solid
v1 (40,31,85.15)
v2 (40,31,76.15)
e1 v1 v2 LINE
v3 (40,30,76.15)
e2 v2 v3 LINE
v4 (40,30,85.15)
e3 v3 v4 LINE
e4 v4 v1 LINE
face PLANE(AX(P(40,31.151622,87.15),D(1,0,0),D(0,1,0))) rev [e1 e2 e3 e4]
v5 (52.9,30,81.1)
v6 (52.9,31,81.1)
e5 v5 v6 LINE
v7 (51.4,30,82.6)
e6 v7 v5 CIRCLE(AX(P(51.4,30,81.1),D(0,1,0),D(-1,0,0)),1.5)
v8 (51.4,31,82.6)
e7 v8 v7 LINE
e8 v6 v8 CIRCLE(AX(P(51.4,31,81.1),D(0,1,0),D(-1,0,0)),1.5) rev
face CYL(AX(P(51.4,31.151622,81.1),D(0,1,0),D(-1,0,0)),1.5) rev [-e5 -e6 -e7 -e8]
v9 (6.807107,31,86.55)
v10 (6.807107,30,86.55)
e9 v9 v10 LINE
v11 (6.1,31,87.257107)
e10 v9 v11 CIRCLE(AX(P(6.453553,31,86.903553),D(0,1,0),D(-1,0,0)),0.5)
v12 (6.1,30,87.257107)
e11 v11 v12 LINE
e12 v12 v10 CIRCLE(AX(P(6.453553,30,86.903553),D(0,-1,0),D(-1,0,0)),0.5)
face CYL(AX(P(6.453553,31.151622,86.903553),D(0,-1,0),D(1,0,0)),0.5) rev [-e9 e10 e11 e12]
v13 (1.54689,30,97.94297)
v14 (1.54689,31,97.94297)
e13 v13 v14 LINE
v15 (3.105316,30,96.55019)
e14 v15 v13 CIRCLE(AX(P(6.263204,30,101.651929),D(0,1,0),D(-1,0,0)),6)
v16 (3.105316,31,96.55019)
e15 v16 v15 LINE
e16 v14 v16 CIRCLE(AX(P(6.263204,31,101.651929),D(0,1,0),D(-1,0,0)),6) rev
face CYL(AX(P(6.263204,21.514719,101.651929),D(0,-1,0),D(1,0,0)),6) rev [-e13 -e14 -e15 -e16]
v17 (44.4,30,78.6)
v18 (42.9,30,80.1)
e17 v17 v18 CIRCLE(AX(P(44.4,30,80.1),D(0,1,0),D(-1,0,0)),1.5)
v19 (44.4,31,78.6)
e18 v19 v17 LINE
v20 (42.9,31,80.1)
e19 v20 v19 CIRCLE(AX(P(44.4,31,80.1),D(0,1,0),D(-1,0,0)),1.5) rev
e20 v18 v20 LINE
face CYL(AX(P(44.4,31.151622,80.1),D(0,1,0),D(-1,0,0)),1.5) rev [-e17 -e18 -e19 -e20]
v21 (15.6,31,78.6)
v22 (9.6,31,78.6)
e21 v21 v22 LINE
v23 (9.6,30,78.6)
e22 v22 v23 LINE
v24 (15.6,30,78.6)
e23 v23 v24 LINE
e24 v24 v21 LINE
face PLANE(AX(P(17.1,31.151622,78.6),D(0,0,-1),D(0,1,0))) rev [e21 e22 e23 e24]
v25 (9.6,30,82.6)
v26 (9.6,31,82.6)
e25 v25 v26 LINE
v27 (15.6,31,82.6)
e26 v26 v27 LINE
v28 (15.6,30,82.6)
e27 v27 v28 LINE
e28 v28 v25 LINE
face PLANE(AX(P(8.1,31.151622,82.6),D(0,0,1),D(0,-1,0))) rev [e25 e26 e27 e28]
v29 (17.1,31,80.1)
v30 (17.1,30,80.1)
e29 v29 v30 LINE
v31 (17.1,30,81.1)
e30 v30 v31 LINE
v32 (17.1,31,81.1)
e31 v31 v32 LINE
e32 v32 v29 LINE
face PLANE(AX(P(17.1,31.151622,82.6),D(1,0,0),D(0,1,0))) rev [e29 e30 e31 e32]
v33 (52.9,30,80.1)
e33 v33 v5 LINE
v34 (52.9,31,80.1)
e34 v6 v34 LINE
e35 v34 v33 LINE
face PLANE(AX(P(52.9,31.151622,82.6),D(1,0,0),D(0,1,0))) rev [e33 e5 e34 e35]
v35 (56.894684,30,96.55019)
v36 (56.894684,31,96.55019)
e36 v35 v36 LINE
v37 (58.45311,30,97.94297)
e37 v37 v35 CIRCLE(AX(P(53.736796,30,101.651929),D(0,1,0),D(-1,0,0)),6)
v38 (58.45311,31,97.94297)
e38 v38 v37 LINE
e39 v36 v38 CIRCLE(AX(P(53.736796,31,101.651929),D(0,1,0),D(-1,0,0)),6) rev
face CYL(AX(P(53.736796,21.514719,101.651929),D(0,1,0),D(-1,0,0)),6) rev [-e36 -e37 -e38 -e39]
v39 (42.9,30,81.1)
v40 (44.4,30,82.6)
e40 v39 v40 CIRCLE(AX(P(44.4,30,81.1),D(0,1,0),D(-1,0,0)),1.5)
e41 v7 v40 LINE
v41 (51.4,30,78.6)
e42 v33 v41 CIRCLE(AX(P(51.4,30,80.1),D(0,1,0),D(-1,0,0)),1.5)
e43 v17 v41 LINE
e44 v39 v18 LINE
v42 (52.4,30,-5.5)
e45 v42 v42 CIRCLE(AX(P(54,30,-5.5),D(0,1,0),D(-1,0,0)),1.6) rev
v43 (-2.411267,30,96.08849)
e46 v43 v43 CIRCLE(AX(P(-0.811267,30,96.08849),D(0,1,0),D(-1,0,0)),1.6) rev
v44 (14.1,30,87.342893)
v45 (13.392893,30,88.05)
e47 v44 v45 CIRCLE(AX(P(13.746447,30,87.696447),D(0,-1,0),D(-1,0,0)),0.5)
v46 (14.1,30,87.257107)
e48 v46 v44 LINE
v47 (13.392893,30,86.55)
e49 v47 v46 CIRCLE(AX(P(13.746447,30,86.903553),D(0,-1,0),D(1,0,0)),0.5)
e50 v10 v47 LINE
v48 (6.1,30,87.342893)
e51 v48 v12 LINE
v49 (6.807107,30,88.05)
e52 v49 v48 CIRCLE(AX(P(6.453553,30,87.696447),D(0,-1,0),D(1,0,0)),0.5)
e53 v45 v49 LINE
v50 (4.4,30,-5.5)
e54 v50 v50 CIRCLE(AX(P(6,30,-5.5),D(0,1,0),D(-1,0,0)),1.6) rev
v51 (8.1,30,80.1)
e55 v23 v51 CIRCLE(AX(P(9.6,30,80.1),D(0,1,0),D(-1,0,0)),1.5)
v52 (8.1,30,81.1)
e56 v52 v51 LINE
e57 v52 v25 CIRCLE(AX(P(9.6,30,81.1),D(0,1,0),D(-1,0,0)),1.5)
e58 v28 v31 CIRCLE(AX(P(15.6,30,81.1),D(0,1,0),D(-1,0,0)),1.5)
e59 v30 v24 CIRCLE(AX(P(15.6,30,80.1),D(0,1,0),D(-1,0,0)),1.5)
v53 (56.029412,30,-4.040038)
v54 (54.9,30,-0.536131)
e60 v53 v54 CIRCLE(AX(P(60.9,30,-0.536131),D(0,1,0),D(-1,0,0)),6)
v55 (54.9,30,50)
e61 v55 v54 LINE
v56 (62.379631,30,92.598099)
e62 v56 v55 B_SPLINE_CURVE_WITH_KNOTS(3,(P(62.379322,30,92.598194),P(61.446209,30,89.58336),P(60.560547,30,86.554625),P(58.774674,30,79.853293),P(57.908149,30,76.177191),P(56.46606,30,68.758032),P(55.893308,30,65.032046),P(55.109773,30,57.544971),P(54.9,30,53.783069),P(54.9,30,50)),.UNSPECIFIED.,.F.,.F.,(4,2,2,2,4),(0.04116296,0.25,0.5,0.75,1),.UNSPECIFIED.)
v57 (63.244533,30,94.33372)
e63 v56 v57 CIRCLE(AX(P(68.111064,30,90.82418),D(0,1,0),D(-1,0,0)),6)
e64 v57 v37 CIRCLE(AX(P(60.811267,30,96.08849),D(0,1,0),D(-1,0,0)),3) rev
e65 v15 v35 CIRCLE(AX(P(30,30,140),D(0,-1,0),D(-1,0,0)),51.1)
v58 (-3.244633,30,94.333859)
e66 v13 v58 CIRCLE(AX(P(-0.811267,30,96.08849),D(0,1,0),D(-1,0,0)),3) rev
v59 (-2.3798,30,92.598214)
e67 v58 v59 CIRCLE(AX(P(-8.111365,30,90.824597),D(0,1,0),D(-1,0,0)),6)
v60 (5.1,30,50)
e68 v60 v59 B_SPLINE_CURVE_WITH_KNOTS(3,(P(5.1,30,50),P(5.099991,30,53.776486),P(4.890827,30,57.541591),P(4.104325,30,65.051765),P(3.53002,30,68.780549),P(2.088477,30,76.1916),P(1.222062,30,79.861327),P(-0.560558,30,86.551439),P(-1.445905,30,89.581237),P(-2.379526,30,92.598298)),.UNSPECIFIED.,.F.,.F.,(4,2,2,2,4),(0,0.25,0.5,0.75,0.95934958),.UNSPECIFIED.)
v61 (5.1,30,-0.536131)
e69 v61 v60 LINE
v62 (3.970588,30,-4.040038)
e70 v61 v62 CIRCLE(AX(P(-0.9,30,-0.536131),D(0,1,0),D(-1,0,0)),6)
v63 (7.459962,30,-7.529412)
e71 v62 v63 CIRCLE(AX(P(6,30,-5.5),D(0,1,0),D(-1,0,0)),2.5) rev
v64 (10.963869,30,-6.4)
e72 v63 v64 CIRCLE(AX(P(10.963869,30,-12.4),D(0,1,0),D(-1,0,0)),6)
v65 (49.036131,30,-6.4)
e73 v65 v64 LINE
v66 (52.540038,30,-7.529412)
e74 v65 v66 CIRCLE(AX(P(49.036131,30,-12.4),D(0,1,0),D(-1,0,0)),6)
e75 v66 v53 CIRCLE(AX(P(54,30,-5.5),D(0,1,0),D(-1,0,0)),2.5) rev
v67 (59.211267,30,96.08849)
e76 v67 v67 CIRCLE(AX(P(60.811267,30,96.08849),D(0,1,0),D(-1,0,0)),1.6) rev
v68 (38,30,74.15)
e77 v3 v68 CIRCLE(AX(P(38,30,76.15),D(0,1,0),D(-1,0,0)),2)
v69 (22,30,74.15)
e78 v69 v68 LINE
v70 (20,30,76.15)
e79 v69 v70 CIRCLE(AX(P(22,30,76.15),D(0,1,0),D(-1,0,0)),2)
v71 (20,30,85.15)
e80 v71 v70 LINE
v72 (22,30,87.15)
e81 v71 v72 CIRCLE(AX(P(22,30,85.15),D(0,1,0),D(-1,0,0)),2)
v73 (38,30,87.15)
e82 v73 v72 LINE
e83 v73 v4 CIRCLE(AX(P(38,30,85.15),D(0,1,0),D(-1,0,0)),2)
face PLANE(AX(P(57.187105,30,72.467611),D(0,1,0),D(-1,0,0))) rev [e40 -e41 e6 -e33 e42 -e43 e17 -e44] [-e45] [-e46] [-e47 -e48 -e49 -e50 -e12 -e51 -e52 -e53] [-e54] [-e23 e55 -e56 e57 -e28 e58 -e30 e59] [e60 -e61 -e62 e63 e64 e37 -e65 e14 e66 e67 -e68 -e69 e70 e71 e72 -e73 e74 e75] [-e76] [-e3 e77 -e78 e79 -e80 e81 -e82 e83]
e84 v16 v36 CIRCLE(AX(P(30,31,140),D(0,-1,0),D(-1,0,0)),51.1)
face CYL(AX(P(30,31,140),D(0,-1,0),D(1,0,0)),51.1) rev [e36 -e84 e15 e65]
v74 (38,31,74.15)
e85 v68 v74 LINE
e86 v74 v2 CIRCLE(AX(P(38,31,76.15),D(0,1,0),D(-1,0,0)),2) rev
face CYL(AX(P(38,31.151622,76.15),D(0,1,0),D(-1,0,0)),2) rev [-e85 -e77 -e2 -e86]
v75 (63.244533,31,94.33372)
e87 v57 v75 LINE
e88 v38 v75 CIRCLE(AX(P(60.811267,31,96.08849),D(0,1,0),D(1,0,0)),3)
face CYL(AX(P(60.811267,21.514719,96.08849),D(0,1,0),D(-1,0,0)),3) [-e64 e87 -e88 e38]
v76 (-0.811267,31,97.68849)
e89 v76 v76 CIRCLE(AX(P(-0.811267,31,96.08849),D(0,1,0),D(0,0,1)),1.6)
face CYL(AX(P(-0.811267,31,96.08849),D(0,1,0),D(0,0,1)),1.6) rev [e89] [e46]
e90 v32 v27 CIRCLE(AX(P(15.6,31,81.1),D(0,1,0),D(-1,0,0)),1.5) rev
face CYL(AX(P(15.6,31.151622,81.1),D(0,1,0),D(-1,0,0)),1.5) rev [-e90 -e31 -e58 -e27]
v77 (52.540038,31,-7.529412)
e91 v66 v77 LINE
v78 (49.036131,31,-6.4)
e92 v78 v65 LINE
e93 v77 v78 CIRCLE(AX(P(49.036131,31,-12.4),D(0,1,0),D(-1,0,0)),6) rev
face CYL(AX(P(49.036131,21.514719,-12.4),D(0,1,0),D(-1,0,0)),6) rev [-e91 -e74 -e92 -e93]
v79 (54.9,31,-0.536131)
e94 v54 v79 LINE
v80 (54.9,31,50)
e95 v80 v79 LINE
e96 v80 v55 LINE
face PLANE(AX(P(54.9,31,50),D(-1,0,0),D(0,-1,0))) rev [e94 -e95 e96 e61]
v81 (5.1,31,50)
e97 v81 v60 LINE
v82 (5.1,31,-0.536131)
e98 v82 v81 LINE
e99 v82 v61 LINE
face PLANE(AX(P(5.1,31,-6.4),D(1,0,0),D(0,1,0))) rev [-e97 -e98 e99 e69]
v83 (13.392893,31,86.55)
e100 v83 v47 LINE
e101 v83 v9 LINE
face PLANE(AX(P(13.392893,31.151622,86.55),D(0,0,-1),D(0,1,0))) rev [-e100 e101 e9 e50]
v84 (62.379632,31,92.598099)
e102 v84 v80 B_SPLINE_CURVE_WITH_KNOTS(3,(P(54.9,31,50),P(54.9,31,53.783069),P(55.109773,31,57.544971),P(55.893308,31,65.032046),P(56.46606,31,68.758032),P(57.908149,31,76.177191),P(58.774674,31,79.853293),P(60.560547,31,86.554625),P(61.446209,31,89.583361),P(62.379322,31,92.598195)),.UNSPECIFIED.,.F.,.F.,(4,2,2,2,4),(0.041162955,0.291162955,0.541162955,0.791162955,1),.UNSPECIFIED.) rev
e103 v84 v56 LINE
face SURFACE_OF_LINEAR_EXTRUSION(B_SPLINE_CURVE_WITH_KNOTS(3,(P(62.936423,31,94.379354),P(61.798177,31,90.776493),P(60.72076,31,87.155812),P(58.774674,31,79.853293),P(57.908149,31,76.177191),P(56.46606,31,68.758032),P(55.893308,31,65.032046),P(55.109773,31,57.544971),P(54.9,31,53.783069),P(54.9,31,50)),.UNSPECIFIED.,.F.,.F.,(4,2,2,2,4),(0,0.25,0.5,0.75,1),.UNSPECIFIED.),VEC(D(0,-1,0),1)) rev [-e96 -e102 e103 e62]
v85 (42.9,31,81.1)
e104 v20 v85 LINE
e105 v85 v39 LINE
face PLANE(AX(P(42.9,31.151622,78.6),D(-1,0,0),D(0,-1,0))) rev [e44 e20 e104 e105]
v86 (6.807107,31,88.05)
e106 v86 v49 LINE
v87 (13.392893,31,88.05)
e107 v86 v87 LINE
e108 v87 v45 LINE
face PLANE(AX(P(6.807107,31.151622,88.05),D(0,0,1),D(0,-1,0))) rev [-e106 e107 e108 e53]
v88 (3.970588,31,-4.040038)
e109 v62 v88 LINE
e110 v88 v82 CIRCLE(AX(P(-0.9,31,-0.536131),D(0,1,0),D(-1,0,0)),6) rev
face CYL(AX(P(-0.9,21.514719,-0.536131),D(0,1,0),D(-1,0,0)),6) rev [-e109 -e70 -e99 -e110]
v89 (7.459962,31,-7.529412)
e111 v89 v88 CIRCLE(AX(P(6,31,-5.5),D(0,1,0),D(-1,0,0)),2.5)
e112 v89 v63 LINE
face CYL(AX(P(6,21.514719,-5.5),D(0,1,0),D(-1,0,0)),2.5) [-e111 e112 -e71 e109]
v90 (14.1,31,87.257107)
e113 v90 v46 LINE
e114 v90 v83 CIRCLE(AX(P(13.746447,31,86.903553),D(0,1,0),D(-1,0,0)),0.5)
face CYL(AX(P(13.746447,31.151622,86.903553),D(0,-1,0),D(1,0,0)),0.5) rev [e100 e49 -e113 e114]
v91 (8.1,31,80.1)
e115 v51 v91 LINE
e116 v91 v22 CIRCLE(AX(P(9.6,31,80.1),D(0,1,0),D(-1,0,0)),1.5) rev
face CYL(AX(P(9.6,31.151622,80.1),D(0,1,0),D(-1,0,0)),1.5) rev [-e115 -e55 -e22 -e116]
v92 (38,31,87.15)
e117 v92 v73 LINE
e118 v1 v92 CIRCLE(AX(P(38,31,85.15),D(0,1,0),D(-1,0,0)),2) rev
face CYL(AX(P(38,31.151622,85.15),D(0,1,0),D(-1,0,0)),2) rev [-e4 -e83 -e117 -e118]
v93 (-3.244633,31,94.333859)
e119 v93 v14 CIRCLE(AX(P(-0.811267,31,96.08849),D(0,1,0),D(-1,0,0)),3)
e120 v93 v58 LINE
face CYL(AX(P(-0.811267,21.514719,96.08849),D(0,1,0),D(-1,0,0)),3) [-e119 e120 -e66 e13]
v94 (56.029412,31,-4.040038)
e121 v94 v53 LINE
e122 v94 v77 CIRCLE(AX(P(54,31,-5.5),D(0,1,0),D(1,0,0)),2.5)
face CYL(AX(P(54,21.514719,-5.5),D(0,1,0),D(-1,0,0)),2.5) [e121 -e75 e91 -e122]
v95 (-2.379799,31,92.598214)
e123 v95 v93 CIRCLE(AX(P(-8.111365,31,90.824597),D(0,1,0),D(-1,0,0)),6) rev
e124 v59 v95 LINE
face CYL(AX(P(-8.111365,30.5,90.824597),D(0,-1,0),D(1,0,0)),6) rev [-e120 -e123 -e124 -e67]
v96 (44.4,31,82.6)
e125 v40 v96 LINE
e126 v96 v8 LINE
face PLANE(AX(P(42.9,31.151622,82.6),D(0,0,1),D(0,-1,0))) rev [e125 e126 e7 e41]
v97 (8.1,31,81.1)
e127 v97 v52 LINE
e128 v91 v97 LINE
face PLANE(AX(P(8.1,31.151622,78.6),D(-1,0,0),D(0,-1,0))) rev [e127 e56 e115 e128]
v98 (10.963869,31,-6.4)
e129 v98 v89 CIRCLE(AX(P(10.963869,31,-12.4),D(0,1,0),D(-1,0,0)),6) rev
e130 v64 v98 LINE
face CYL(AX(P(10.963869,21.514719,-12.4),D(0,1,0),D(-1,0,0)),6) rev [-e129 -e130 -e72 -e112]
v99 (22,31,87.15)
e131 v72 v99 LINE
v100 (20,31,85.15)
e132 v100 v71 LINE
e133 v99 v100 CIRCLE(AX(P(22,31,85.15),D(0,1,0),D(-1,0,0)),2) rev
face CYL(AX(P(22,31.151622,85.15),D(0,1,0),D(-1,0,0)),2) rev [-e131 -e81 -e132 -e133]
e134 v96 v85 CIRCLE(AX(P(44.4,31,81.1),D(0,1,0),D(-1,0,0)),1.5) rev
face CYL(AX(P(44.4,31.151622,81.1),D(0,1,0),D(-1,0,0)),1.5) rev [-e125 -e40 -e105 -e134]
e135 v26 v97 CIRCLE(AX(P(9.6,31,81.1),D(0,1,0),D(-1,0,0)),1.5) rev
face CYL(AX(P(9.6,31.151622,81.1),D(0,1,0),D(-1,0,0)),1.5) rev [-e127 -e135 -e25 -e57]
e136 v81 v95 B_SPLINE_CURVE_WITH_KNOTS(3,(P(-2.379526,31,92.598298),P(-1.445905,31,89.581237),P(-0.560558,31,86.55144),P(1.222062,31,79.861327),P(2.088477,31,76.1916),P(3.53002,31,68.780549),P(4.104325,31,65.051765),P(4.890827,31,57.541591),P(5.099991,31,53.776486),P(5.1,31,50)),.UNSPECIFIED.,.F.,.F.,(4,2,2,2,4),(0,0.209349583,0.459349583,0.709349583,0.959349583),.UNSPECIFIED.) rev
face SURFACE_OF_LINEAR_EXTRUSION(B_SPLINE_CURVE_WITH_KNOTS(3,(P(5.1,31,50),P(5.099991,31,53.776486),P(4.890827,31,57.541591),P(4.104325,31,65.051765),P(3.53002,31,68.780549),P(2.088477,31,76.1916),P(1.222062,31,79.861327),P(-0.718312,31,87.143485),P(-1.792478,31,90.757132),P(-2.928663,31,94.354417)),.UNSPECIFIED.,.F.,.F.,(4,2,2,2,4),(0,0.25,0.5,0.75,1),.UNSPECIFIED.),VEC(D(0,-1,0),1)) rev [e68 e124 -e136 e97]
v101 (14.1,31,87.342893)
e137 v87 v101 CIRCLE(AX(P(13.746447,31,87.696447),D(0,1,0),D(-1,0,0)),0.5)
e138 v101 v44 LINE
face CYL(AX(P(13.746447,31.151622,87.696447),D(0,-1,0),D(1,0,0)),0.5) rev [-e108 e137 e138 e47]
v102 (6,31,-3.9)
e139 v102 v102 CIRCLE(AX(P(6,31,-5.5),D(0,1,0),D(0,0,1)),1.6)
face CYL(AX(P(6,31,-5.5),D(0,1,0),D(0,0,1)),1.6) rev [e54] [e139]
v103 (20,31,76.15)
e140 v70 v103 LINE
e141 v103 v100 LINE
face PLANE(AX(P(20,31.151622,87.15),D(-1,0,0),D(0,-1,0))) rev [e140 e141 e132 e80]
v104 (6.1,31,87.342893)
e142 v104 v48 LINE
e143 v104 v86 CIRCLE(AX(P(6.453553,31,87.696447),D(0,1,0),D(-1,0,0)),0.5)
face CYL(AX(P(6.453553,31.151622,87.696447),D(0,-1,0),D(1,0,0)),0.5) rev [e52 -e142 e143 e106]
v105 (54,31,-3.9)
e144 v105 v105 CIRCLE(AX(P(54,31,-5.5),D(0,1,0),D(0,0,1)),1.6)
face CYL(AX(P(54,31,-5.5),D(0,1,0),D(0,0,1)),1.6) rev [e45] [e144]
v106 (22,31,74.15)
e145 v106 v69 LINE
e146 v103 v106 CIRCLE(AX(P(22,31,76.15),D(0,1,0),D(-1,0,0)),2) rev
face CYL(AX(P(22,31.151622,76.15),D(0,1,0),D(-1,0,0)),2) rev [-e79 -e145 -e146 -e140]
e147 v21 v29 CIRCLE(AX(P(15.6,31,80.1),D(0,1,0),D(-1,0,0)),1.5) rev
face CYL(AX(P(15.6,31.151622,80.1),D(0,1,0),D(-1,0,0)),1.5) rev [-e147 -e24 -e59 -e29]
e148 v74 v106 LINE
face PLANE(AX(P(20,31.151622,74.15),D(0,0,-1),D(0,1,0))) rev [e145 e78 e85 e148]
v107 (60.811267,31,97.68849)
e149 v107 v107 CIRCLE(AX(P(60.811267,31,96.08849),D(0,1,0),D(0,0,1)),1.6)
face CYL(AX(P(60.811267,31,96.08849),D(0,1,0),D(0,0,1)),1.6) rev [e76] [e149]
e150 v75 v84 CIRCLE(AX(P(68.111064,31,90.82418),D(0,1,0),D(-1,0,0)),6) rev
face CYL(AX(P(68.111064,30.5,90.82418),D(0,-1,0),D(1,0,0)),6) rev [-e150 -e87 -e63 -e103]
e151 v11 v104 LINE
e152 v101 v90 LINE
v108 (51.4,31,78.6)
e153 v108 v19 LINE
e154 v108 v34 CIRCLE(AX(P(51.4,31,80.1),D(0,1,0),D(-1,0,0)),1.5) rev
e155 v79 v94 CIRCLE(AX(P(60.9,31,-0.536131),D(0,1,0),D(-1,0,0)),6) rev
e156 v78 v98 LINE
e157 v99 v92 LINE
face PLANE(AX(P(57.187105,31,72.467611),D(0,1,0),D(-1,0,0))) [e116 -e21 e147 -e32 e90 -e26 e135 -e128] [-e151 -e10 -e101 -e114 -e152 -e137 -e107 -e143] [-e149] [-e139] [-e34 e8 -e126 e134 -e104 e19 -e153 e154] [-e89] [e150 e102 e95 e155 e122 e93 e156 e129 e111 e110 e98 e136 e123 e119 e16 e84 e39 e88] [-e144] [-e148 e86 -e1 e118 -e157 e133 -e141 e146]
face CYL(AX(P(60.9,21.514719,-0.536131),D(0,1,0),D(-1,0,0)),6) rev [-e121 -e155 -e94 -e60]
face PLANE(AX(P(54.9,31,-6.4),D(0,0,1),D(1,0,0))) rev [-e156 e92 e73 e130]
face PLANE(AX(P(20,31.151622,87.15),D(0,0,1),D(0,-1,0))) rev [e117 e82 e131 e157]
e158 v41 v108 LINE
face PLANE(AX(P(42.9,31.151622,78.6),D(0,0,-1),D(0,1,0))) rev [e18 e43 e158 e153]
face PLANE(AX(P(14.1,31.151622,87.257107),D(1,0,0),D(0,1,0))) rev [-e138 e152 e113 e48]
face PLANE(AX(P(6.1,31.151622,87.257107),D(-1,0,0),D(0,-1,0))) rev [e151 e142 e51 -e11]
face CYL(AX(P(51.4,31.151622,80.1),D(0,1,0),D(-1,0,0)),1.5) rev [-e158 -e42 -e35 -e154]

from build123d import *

# Parameters (mm, degrees)
COVER_MAIN_BOARD_1_START = 30
COVER_MAIN_BOARD_1_DEPTH = 1
SKETCH_2_R               = 2.5
SKETCH_2_R_2             = 3
EXTRUDE_1_DEPTH          = 1
FILLET_1_R               = 6
HOLE_WIZARD_M31_D        = 3.2
SKETCH_5_W               = 20
SKETCH_5_H               = 13
CUT_EXTRUDE_2_DEPTH      = 118.861812366
FILLET_2_R               = 2
CUT_EXTRUDE_3_DEPTH      = 118.861812366
SKETCH_7_W               = 10
SKETCH_7_H               = 4
SKETCH_7_W_2             = 9
CUT_EXTRUDE_4_DEPTH      = 118.861812366
FILLET_3_R               = 1.5


# Read off the part's stored shape, not the designer's step: Припуск-Cover_main_board-1
with BuildPart() as part:
    # Припуск-Cover_main_board-1 outline → Припуск-Cover_main_board-1 (new body)
    with BuildSketch(Plane(origin=(0, 0, 0), x_dir=(1, 0, 0), z_dir=(0, 1, 0)).offset(COVER_MAIN_BOARD_1_START)):
        with BuildLine():
            ThreePointArc((58.536662962, -97.610509717), (61.872887908, -97.542255565), (62.936422695, -94.379353532))
            add(Edge.make_bspline(
                [(62.936422695, -94.379353532), (61.798177223, -90.776493028), (60.72075986, -87.155811957), (58.774674414, -79.85329338), (57.908149184, -76.177190929), (56.466060339, -68.758031881), (55.893308454, -65.032046108), (55.109773151, -57.544971093), (54.899999704, -53.783069267), (54.9, -50)],
                knots=[0, 0, 0, 0, 0.25, 0.25, 0.5, 0.5, 0.75, 0.75, 1, 1, 1, 1], degree=3))
            Line((54.9, -50), (54.9, 6.4))
            Line((54.9, 6.4), (5.1, 6.4))
            Line((5.1, 6.4), (5.1, -50))
            add(Edge.make_bspline(
                [(5.1, -50), (5.099991031, -53.776486453), (4.890826579, -57.541590974), (4.10432522, -65.051764617), (3.53002006, -68.780548712), (2.088476888, -76.191600122), (1.222062078, -79.86132679), (-0.718312327, -87.143485068), (-1.7924779, -90.75713228), (-2.928662588, -94.354417399)],
                knots=[0, 0, 0, 0, 0.25, 0.25, 0.5, 0.5, 0.75, 0.75, 1, 1, 1, 1], degree=3))
            ThreePointArc((-2.928662588, -94.354417399), (-1.883263044, -97.534459074), (1.463338472, -97.610508751))
            ThreePointArc((1.463338472, -97.610508751), (30.000000864, -88.89999981), (58.536662962, -97.610509717))
        make_face()
    extrude(amount=COVER_MAIN_BOARD_1_DEPTH)

    # Эскиз2 → Бобышка-Вытянуть1 (add)
    with BuildSketch(Plane(origin=(0, 31, 0), x_dir=(1, 0, 0), z_dir=(0, 1, 0))):
        with Locations((6, 5.5)):
            Circle(SKETCH_2_R)
        with Locations((54, 5.5)):
            Circle(SKETCH_2_R)
        with Locations((-0.811267397, -96.088490424)):
            Circle(SKETCH_2_R_2)
        with Locations((60.811267397, -96.088490424)):
            Circle(SKETCH_2_R_2)
    extrude(amount=-EXTRUDE_1_DEPTH)

    # Скругление1
    fillet_1_edges = [part.edges().sort_by_distance(p)[0] for p in [
        (-2.75519034, 30.5, 93.803503862),
        (1.934506666, 30.5, 97.297094907),
        (58.065493335, 30.5, 97.297094908),
        (62.755023846, 30.5, 93.803362229),
        (54.9, 30.5, -3.167619242),
        (51.667619242, 30.5, -6.4),
        (8.332380758, 30.5, -6.4),
        (5.1, 30.5, -3.167619242),
    ]]
    fillet(fillet_1_edges, radius=FILLET_1_R)

    # Отверстие с зазором M31 (through all)
    with Locations(Plane(origin=(0, 31, 0), x_dir=(1, 0, 0), z_dir=(0, 1, 0))):
        with Locations((-0.811267397, -96.088490424), (60.811267397, -96.088490424), (54, 5.5), (6, 5.5)):
            Hole(HOLE_WIZARD_M31_D / 2)

    # Эскиз5 → Вырез-Вытянуть2 (cut, through all)
    with BuildSketch(Plane.XZ.offset(-30)):
        with Locations((30, 80.64999981)):
            Rectangle(SKETCH_5_W, SKETCH_5_H)
    extrude(amount=-CUT_EXTRUDE_2_DEPTH, mode=Mode.SUBTRACT)

    # Скругление2
    fillet_2_edges = [part.edges().sort_by_distance(p)[0] for p in [
        (40, 30.5, 87.14999981),
        (40, 30.5, 74.14999981),
        (20, 30.5, 74.14999981),
        (20, 30.5, 87.14999981),
    ]]
    fillet(fillet_2_edges, radius=FILLET_2_R)

    # Эскиз6 → Вырез-Вытянуть3 (cut, through all)
    with BuildSketch(Plane.XZ.offset(-30)):
        with BuildLine():
            Line((6.807106781, 88.05), (13.392893219, 88.05))
            ThreePointArc((13.392893219, 88.05), (14.1, 88.05), (14.1, 87.342893219))
            Line((14.1, 87.342893219), (14.1, 87.257106781))
            ThreePointArc((14.1, 87.257106781), (14.1, 86.55), (13.392893219, 86.55))
            Line((13.392893219, 86.55), (6.807106781, 86.55))
            ThreePointArc((6.807106781, 86.55), (6.1, 86.55), (6.1, 87.257106781))
            Line((6.1, 87.257106781), (6.1, 87.342893219))
            ThreePointArc((6.1, 87.342893219), (6.1, 88.05), (6.807106781, 88.05))
        make_face()
    extrude(amount=-CUT_EXTRUDE_3_DEPTH, mode=Mode.SUBTRACT)

    # Эскиз7 → Вырез-Вытянуть4 (cut, through all)
    with BuildSketch(Plane.XZ.offset(-30)):
        with Locations((47.9, 80.6)):
            Rectangle(SKETCH_7_W, SKETCH_7_H)
        with Locations((12.6, 80.6)):
            Rectangle(SKETCH_7_W_2, SKETCH_7_H)
    extrude(amount=-CUT_EXTRUDE_4_DEPTH, mode=Mode.SUBTRACT)

    # Скругление3
    fillet_3_edges = [part.edges().sort_by_distance(p)[0] for p in [
        (42.9, 30.5, 78.6),
        (42.9, 30.5, 82.6),
        (52.9, 30.5, 82.6),
        (52.9, 30.5, 78.6),
        (17.1, 30.5, 82.6),
        (17.1, 30.5, 78.6),
        (8.1, 30.5, 78.6),
        (8.1, 30.5, 82.6),
    ]]
    fillet(fillet_3_edges, radius=FILLET_3_R)


solid = part.part
